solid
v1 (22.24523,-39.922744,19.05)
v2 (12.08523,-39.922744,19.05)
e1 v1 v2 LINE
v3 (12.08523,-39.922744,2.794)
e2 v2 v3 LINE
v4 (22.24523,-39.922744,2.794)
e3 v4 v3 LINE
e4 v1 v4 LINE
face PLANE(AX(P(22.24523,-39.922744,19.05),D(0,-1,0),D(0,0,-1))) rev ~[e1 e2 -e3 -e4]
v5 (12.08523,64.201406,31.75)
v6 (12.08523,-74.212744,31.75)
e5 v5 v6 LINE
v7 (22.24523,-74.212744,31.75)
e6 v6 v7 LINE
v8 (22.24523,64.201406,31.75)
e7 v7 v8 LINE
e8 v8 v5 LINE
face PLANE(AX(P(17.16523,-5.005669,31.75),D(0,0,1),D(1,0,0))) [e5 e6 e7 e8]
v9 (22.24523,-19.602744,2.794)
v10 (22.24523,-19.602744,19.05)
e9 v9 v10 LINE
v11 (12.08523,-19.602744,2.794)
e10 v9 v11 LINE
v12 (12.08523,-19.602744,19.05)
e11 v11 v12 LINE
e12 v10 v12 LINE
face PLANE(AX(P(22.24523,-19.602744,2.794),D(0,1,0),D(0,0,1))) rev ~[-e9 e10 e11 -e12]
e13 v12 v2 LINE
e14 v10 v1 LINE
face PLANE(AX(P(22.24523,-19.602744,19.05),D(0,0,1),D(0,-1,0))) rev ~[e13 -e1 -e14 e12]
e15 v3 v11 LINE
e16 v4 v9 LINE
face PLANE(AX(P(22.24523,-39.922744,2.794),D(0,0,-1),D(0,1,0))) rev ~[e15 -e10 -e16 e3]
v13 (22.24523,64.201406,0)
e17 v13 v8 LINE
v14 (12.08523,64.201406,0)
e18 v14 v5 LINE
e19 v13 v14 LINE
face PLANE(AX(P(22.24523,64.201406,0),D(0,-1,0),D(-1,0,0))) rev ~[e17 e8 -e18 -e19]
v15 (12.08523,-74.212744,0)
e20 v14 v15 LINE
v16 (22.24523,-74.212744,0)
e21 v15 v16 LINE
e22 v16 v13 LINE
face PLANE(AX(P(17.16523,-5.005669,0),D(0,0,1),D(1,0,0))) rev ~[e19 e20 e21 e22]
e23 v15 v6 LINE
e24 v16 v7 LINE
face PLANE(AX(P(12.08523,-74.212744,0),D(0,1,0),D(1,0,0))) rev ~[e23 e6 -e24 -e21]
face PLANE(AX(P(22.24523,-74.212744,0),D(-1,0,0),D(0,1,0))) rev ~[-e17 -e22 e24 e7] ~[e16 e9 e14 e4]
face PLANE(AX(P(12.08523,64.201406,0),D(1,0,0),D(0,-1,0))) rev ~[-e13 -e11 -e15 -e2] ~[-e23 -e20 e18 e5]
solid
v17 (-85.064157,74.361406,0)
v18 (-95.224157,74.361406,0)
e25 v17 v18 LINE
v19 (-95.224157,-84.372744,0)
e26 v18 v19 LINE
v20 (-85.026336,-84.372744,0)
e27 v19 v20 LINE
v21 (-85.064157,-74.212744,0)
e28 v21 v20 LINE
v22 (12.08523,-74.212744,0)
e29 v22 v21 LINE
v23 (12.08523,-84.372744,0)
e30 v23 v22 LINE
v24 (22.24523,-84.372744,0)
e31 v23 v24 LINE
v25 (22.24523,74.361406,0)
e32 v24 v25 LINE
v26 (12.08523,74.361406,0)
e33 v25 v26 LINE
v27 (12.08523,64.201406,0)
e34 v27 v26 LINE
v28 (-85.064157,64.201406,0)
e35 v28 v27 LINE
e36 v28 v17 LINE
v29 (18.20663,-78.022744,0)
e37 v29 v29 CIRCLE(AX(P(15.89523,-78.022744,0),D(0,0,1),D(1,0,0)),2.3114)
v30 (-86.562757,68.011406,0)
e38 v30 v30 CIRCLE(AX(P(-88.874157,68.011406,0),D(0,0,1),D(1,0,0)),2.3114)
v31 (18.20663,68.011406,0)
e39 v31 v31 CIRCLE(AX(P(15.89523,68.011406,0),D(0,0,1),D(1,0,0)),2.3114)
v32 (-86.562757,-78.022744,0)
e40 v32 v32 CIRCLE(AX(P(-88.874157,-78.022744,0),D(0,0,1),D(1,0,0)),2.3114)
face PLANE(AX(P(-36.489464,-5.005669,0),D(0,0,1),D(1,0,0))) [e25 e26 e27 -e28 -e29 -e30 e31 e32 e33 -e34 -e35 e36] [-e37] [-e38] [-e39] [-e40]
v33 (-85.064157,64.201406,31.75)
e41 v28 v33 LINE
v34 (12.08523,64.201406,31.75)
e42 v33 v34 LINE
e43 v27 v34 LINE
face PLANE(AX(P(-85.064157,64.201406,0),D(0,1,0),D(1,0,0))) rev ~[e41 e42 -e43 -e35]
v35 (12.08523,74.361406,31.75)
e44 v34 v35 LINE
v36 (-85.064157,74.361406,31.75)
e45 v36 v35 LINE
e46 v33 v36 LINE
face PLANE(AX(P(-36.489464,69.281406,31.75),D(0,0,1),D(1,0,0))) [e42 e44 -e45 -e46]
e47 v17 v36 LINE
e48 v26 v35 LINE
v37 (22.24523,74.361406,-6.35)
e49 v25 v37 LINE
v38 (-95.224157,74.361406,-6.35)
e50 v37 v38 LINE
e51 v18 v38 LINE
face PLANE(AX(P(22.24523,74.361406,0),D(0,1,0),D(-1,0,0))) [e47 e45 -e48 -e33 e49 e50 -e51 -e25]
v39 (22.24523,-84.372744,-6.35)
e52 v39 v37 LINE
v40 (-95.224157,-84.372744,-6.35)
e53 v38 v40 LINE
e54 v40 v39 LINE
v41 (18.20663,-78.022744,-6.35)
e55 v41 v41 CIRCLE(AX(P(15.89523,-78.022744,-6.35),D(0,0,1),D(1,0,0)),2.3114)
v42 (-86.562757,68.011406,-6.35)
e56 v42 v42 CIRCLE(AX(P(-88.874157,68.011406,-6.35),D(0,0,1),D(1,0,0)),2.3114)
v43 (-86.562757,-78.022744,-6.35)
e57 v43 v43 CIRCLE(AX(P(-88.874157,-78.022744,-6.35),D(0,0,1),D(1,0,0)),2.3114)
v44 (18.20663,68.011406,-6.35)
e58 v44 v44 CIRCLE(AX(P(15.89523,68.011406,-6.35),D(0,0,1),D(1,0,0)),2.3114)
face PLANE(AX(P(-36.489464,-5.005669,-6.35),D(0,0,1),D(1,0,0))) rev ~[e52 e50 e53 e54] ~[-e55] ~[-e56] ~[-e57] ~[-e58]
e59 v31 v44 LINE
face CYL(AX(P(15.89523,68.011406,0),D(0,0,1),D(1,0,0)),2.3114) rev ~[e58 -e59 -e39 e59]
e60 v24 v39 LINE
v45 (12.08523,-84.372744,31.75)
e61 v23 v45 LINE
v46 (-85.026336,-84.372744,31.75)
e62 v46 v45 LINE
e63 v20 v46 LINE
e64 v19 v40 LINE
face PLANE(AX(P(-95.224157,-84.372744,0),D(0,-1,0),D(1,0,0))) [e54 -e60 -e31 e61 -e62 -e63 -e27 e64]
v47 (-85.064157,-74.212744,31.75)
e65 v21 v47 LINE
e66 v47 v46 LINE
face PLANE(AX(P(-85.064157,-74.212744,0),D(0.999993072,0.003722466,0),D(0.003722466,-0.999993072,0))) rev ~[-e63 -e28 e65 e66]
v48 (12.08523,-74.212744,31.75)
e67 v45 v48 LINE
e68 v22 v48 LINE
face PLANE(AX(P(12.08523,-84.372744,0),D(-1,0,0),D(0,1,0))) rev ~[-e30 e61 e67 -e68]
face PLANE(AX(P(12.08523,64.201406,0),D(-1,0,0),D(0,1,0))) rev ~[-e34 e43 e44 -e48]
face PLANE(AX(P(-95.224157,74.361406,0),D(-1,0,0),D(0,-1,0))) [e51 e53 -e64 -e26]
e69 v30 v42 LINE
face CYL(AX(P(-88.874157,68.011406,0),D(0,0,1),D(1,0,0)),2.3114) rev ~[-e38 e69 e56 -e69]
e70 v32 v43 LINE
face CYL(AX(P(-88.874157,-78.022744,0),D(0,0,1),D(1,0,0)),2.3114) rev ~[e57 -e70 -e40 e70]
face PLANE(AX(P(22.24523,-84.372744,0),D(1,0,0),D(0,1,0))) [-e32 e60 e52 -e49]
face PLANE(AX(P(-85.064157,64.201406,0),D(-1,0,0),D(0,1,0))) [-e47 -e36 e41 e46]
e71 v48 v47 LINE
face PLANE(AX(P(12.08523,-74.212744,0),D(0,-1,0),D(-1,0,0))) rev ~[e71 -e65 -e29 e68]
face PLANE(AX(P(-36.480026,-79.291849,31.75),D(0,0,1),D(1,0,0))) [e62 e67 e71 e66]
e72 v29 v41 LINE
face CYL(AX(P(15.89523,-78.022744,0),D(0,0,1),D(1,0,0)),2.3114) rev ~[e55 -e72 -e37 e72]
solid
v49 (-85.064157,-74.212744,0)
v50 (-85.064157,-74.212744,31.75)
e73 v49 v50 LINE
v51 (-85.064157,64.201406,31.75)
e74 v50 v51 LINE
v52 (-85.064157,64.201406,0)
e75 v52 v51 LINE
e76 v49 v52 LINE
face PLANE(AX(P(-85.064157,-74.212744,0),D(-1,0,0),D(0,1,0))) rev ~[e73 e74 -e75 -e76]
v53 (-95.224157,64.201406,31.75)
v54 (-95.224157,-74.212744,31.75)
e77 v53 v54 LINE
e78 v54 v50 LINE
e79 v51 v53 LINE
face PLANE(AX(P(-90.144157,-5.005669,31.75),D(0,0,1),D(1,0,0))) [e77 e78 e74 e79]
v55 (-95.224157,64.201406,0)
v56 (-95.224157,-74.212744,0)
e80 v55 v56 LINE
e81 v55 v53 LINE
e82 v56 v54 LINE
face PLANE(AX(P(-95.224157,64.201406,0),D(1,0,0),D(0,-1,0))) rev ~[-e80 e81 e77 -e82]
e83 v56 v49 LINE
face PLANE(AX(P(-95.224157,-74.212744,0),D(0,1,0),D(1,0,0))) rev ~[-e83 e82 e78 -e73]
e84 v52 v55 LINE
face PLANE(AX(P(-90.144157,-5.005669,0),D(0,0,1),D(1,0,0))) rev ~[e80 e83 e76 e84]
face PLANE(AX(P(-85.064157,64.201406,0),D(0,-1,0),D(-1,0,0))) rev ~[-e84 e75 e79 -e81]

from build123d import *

# Parameters (mm, degrees)
F0_R     = 2.3114
F0_W     = 97.1493866
F0_H     = 10.16
F1_DEPTH = 6.35
F2_DEPTH = 31.75
F3_DEPTH = 31.75
F4_DEPTH = 31.75
F5_DEPTH = 31.75
F7_DEPTH = 10.16


# Not quite as in the source:
# - a feature names something its author has since deleted; it is built from what else it names


with BuildPart() as f1:
    # F0 (on Top) → F1 (new body)
    with BuildSketch(Plane.XY):
        Polygon((12.0852296243, 64.2014063512), (-85.0641569757, 64.2014063512), (-85.0641569757, 61.6614063512), (-85.0641569757, 48.9614063512), (-85.0641569757, -61.5127440488), (-85.0641569757, -74.2127440488), (-72.3641569757, -74.2127440488), (-0.6147703757, -74.2127440488), (12.0852296243, -74.2127440488), (12.0852296243, -61.5127440488), (12.0852296243, 48.9614063512), (12.0852296243, 61.6614063512), align=None)
        Polygon((22.2452296243, -78.0227440488), (22.2452296243, -74.2127440488), (12.0852296243, -74.2127440488), (12.0852296243, -84.3727440488), (15.8952296243, -84.3727440488), (22.2452296243, -84.3727440488), align=None)
        with Locations((15.8952296243, -78.0227440488)):
            Circle(F0_R, mode=Mode.SUBTRACT)
        Polygon((-88.8741569757, 74.3614063512), (-95.2241569757, 74.3614063512), (-95.2241569757, 68.0114063512), (-95.2241569757, 64.2014063512), (-85.0641569757, 64.2014063512), (-85.0641569757, 74.3614063512), align=None)
        with Locations((-88.8741569757, 68.0114063512)):
            Circle(F0_R, mode=Mode.SUBTRACT)
        Polygon((-85.0641569757, -74.2127440488), (-95.2241569757, -74.2127440488), (-95.2241569757, -78.0227440488), (-95.2241569757, -84.3727440488), (-88.8741569757, -84.3727440488), (-85.0641569757, -84.3727440488), (-85.026336457, -84.3727440488), align=None)
        with Locations((-88.8741569757, -78.0227440488)):
            Circle(F0_R, mode=Mode.SUBTRACT)
        Polygon((22.2452296243, 64.2014063512), (12.0852296243, 64.2014063512), (12.0852296243, 61.6614063512), (12.0852296243, 48.9614063512), (12.0852296243, -61.5127440488), (12.0852296243, -74.2127440488), (22.2452296243, -74.2127440488), align=None)
        Polygon((-72.3641569757, -74.2127440488), (-85.0641569757, -74.2127440488), (-85.026336457, -84.3727440488), (12.0852296243, -84.3727440488), (12.0852296243, -74.2127440488), (-0.6147703757, -74.2127440488), align=None)
        with Locations((-36.4894636757, 69.2814063512)):
            Rectangle(F0_W, F0_H)
        Polygon((-85.0641569757, 64.2014063512), (-95.2241569757, 64.2014063512), (-95.2241569757, 61.6614063512), (-95.2241569757, -74.2127440488), (-85.0641569757, -74.2127440488), (-85.0641569757, -61.5127440488), (-85.0641569757, 48.9614063512), (-85.0641569757, 61.6614063512), align=None)
        Polygon((15.8952296243, 74.3614063512), (12.0852296243, 74.3614063512), (12.0852296243, 64.2014063512), (22.2452296243, 64.2014063512), (22.2452296243, 68.0114063512), (22.2452296243, 74.3614063512), align=None)
        with Locations((15.8952296243, 68.0114063512)):
            Circle(F0_R, mode=Mode.SUBTRACT)
    extrude(amount=-F1_DEPTH)

    # F0 (on Top) → F2 (join)
    with BuildSketch(Plane.XY):
        with Locations((-36.4894636757, 69.2814063512)):
            Rectangle(F0_W, F0_H)
    extrude(amount=F2_DEPTH)

    # F0 (on Top) → F3 (join)
    with BuildSketch(Plane.XY):
        Polygon((-72.3641569757, -74.2127440488), (-85.0641569757, -74.2127440488), (-85.026336457, -84.3727440488), (12.0852296243, -84.3727440488), (12.0852296243, -74.2127440488), (-0.6147703757, -74.2127440488), align=None)
    extrude(amount=F3_DEPTH)


with BuildPart() as f4:
    # F0 (on Top) → F4 (new body)
    with BuildSketch(Plane.XY):
        Polygon((22.2452296243, 64.2014063512), (12.0852296243, 64.2014063512), (12.0852296243, 61.6614063512), (12.0852296243, 48.9614063512), (12.0852296243, -61.5127440488), (12.0852296243, -74.2127440488), (22.2452296243, -74.2127440488), align=None)
    extrude(amount=F4_DEPTH)

    # F6 (on face) → F7 (cut)
    with BuildSketch(Plane.YZ.offset(22.2452296243)):
        Polygon((-39.9227440488, 19.05), (-39.9227440488, 17.3254348338), (-39.9227440488, 2.794), (-19.6027440488, 2.794), (-19.6027440488, 19.05), (-31.9871492684, 19.05), align=None)
    extrude(amount=-F7_DEPTH, mode=Mode.SUBTRACT)


with BuildPart() as f5:
    # F0 (on Top) → F5 (new body)
    with BuildSketch(Plane.XY):
        Polygon((-85.0641569757, 64.2014063512), (-95.2241569757, 64.2014063512), (-95.2241569757, 61.6614063512), (-95.2241569757, -74.2127440488), (-85.0641569757, -74.2127440488), (-85.0641569757, -61.5127440488), (-85.0641569757, 48.9614063512), (-85.0641569757, 61.6614063512), align=None)
    extrude(amount=F5_DEPTH)


solid = Compound([f1.part, f4.part, f5.part])
